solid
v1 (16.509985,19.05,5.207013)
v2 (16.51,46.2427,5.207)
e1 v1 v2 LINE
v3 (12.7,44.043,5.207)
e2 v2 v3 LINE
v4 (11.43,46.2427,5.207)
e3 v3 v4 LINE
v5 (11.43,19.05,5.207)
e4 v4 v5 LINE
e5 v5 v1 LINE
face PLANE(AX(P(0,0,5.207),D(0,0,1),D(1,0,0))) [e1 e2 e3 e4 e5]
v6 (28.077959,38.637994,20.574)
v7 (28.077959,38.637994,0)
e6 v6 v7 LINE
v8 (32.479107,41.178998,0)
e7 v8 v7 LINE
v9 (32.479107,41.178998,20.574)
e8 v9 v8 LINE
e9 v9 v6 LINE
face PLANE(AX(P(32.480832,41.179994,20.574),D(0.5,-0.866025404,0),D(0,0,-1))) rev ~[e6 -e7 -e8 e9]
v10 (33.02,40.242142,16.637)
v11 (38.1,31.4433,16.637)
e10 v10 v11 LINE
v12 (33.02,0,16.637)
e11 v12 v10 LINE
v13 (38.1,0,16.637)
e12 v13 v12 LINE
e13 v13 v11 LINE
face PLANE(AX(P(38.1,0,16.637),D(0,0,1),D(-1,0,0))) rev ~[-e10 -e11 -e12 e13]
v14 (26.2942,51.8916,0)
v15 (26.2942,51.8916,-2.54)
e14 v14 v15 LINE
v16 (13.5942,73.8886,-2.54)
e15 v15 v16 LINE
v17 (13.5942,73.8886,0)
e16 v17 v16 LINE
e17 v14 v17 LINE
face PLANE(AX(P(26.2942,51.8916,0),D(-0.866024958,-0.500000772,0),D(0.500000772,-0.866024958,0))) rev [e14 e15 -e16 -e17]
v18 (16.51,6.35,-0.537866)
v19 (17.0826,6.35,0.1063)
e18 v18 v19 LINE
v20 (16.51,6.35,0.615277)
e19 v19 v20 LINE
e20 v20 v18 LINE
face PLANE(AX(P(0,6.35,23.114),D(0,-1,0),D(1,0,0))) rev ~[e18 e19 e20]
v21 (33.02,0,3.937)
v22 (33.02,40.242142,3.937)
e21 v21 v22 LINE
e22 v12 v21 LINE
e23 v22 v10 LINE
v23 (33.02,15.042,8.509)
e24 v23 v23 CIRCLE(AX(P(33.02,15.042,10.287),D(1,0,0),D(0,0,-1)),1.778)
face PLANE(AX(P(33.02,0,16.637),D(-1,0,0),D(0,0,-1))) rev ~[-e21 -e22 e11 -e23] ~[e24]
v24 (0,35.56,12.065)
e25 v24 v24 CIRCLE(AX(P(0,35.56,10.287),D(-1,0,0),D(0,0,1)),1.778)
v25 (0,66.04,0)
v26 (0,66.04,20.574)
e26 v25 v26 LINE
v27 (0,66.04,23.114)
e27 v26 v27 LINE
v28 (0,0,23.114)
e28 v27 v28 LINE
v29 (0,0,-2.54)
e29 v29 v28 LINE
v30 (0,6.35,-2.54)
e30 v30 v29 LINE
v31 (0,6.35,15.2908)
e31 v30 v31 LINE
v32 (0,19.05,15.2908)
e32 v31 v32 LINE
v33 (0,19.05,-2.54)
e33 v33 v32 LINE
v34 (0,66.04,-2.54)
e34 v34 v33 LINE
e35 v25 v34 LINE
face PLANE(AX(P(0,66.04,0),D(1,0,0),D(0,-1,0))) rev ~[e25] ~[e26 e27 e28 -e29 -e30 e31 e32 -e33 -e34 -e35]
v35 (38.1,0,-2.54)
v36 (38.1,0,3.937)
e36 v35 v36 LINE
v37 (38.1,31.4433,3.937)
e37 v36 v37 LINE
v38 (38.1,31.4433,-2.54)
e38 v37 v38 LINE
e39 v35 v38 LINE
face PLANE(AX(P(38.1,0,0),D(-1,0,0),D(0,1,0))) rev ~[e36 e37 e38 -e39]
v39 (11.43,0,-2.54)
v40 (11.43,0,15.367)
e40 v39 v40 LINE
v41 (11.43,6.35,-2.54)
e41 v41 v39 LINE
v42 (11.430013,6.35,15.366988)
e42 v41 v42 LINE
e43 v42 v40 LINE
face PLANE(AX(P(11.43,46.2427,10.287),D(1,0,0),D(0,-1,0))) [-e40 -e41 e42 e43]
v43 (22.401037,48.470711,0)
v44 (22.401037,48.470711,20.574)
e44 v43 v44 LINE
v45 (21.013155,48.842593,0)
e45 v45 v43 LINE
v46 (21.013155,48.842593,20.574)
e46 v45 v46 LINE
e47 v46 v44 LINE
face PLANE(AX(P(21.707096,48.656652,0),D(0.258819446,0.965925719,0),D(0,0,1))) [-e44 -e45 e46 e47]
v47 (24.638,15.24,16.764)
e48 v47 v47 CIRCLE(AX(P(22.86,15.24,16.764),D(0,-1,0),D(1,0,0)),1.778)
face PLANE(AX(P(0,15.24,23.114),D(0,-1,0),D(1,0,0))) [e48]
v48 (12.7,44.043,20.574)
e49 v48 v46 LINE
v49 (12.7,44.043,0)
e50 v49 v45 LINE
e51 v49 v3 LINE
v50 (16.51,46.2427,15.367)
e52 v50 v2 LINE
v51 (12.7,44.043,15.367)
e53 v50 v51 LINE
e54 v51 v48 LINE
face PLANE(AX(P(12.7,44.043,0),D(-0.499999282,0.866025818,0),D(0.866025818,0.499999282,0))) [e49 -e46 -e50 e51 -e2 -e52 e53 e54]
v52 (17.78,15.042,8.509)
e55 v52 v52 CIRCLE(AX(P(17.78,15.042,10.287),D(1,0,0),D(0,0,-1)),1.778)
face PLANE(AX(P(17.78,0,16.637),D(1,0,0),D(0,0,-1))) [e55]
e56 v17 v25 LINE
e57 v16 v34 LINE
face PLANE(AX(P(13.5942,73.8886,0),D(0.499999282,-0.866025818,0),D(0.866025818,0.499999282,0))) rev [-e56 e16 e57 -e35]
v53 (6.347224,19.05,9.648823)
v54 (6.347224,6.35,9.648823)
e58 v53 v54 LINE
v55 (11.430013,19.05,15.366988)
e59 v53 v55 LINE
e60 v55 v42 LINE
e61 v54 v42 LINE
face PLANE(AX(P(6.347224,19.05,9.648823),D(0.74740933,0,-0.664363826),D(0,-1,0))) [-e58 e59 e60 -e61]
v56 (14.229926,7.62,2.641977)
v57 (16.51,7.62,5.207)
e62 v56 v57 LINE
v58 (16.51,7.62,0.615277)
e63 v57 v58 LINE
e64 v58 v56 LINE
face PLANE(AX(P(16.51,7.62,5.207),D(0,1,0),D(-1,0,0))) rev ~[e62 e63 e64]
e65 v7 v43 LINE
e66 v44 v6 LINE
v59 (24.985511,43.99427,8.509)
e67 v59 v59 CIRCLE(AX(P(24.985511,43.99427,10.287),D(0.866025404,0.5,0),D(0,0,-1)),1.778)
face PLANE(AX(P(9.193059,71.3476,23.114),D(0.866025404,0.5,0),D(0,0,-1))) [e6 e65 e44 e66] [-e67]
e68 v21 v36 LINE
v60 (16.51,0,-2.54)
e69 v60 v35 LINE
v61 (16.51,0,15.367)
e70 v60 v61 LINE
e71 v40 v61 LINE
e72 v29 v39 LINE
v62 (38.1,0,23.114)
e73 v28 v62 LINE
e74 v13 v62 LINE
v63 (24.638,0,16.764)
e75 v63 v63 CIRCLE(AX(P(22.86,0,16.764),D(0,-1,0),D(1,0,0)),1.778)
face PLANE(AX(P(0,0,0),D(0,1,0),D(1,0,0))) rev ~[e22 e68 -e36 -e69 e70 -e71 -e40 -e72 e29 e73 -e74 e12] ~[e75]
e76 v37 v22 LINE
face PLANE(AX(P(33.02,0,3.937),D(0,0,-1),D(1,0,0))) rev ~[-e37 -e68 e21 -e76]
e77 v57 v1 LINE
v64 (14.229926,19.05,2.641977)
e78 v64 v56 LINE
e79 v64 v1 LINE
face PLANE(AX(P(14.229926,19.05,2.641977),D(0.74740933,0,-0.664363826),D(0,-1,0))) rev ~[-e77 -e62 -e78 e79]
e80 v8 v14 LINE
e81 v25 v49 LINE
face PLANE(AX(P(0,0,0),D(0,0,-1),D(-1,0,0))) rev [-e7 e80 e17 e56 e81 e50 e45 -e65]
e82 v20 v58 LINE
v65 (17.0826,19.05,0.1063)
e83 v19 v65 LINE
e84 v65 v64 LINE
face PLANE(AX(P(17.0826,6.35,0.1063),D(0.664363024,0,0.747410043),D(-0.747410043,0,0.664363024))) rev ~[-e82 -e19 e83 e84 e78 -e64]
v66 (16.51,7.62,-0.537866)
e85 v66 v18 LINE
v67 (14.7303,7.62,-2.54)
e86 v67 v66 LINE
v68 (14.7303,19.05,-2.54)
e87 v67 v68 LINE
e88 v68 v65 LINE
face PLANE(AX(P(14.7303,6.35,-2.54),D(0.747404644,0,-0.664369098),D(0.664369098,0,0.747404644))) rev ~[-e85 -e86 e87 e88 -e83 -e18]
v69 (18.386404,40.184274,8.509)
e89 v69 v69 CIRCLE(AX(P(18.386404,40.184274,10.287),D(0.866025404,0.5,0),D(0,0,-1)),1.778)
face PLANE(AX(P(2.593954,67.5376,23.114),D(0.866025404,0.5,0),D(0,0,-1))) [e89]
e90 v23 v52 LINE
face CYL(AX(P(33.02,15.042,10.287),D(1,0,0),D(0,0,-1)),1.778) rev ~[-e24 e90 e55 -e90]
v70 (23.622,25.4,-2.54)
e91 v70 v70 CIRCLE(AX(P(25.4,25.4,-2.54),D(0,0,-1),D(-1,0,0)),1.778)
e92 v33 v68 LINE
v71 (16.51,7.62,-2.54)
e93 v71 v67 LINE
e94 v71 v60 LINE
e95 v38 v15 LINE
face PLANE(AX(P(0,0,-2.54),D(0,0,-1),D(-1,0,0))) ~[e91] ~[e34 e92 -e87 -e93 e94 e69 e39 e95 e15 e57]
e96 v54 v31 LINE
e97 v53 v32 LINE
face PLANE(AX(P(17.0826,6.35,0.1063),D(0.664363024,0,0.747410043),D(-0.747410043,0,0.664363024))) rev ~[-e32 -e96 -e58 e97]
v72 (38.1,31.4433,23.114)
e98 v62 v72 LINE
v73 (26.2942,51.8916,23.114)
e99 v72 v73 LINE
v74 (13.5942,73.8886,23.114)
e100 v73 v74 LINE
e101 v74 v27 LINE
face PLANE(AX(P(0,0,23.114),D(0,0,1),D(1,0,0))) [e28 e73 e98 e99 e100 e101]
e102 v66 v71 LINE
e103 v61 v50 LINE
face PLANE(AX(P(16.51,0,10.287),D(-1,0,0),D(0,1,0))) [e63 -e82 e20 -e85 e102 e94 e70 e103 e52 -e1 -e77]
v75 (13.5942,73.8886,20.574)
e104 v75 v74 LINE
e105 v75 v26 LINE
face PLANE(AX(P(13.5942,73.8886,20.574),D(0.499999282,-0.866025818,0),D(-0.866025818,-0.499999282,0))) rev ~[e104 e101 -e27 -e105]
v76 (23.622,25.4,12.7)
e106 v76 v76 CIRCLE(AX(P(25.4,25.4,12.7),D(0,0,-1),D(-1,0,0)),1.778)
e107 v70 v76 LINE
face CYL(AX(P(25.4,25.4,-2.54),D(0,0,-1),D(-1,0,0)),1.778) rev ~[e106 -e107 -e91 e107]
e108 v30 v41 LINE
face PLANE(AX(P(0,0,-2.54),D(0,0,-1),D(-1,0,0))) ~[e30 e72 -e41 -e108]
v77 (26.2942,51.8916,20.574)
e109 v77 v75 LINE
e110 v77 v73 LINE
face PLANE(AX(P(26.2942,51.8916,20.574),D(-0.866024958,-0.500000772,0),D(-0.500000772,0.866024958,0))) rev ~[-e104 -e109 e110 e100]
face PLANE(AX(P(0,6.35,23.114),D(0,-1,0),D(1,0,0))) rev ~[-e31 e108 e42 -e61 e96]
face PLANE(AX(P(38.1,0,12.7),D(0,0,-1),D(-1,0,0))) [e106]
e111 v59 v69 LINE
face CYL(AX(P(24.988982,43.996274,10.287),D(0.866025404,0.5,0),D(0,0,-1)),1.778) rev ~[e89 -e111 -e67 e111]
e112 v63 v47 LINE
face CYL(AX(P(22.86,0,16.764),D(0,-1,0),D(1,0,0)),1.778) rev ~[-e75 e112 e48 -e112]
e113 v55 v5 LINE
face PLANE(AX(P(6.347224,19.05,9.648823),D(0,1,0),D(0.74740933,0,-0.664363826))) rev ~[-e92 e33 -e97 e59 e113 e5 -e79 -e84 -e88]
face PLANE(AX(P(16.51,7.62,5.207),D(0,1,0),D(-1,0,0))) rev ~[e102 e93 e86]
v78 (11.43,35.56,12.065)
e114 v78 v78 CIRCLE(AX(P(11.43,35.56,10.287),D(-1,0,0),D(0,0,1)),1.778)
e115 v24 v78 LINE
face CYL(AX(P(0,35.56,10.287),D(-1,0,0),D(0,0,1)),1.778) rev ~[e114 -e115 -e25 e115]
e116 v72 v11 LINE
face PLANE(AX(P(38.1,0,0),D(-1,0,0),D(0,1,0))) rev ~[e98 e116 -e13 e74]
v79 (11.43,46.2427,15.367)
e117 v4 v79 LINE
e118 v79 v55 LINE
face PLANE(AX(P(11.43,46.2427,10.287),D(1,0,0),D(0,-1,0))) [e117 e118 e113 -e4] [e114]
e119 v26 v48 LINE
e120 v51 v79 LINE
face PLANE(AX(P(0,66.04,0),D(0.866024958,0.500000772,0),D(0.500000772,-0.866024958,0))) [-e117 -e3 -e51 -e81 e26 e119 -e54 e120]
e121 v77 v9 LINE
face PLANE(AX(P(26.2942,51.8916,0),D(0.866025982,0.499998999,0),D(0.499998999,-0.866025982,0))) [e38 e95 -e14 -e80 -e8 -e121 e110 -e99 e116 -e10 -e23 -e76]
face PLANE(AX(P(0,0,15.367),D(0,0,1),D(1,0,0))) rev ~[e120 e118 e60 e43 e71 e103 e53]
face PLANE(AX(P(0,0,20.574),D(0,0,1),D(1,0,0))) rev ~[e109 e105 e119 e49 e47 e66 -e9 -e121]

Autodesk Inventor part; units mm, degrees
ref_plane "YZ Plane" through (0, 0, 0) normal (1, 0, 0) x (0, 1, 0)
ref_plane "XZ Plane" through (0, 0, 0) normal (0, 1, 0) x (-1, 0, 0)
sketch "Sketch1" plane through (0, 0, 0) normal (0, 0, 1) x (1, 0, 0)
  line L0 (0, 0) -> (38.1, 0)
  line L1 (38.1, 0) -> (38.1, 31.4433)
  line L2 (0, 66.04) -> (0, 0)
  line L3 (0, 66.04) -> (13.5942, 73.8886)
  line L4 (0, 66.04) -> (12.7, 44.043)
  line L5 (12.7, 44.043) -> (26.2942, 51.8916)
  line L6 (26.2942, 51.8916) -> (13.5942, 73.8886)
  line L7 (26.2942, 51.8916) -> (38.1, 31.4433)
  dimension "d0" = 15.6972
  dimension "d1" = 25.4
  dimension "d2" = 38.1
  dimension "d3" = 66.04
  dimension "d4" = 120
extrude "Extrusion1" add sketch "Sketch1" along normal blind 20.574 contours L2 L4 L5 L7 L1 L0
sketch "Sketch2" plane through (0, 0, 20.574) normal (0, 0, 1) x (1, 0, 0)
  line L0 (0, 66.04) -> (0, 0) projected
  line L1 (0, 0) -> (38.1, 0) projected
  line L2 (38.1, 0) -> (38.1, 31.4433) projected
  line L3 (38.1, 31.4433) -> (26.2942, 51.8916) projected
  line L4 (26.2942, 51.8916) -> (12.7, 44.043) projected
  line L5 (12.7, 44.043) -> (0, 66.04) projected
  line L6 (26.2942, 51.8916) -> (13.5942, 73.8886)
  line L7 (13.5942, 73.8886) -> (0, 66.04)
  line L8 (38.1, 31.4433) -> (26.2942, 51.8916) projected
extrude "Extrusion2" add sketch "Sketch2" along normal blind 2.54
ref_plane "Work Plane1" through (0, 0, 10.287) normal (0, 0, -1) x (-1, 0, 0)
mirror "Mirror1" about plane through (0, 0, 10.287) normal (0, 0, -1) of "Extrusion2"
sketch "Sketch3" plane through (0, 0, 23.114) normal (0, -1, 0) x (1, 0, 0)
  line L0 (38.1, -25.654) -> (38.1, 0) projected
  line L1 (38.1, -6.477) -> (33.02, -6.477)
  line L2 (33.02, -6.477) -> (33.02, -19.177)
  line L3 (33.02, -19.177) -> (38.1, -19.177)
  line L4 (38.1, -19.177) -> (38.1, -6.477)
  point P0 (0, -23.114)
  point P1 (38.1, -12.827)
  dimension "d9" = 12.7
  dimension "d10" = 5.08
  dimension "d11" = 6.35
extrude "Extrusion3" cut sketch "Sketch3" against normal blind 111.125
sketch "Sketch4" plane through (33.02, 0, 16.637) normal (1, 0, 0) x (0, 0, -1)
  circle A0 centre (6.35, 15.042) radius 1.778 projected
  point P0 (16.637, 0)
extrude "Extrusion4" cut sketch "Sketch4" against normal blind 15.24
sketch "Sketch5" plane through (13.5942, 73.8886, 23.114) normal (0.8660254, 0.5, 0) x (0, 0, -1)
  line L0 (23.114, -25.4) -> (2.54, -25.4) projected
  line L1 (23.114, -25.4) -> (2.54, -25.4)
  line L2 (2.54, -25.4) -> (2.54, -37.7698)
  line L3 (2.54, -37.7698) -> (23.114, -37.7698)
  line L4 (23.114, -37.7698) -> (23.114, -25.4)
  point P0 (23.114, -57.1923)
  dimension "d16" = 12.3698
extrude "Extrusion5" cut sketch "Sketch5" against normal blind 5.08
chamfer "Chamfer1" distance 1.016 angle 45 1 edges at (21.893, 49.3506, 10.287)
sketch "Sketch6" plane through (9.1948, 71.3486, 23.114) normal (0.8660254, 0.5, 0) x (0, 0, -1)
  line L0 (22.86, -25.4) -> (2.54, -25.4) projected
  line L1 (23.114, -37.7698) -> (2.54, -37.7698) projected
  line L2 (2.54, -25.4) -> (2.54, 0) projected
  line L3 (2.54, -37.7698) -> (2.54, 0) projected
  line L4 (2.54, -25.4) -> (2.54, -37.7698)
  circle A0 centre (12.827, -31.5849) radius 1.778
  point P0 (23.114, -57.1923)
  point P1 (2.54, -31.5849)
  point P2 (12.827, -37.7698)
  dimension "d22" = 3.556
extrude "Extrusion6" cut sketch "Sketch6" against normal blind 7.62
ref_plane "Work Plane2" through (0, 0, 10.287) normal (0, 0, 1) x (1, 0, 0)
sketch "Sketch7" plane through (0, 0, 10.287) normal (0, 0, 1) x (1, 0, 0)
  line L0 (12.7, 44.043) -> (-2.54, 70.4394) projected
  line L1 (21.0809, 48.8817) -> (12.7, 44.043) projected
  line L2 (16.51, 46.2427) -> (11.43, 46.2427)
  line L3 (11.43, 46.2427) -> (11.43, 0)
  line L4 (11.43, 0) -> (16.51, 0)
  line L5 (16.51, 0) -> (16.51, 46.2427)
  line L6 (0, 0) -> (38.1, 0) projected
  dimension "d25" = 5.08
extrude "Extrusion7" cut sketch "Sketch7" along normal mid plane 10.16 contours L1 L5 L4 L3 L0
ref_plane "Work Plane3" through (0, 6.35, 23.114) normal (0, -1, 0) x (1, 0, 0)
sketch "Sketch8" plane through (0, 6.35, 23.114) normal (0, -1, 0) x (1, 0, 0)
  line L0 (0, -25.654) -> (38.1, -25.654) projected
  line L1 (0, -25.654) -> (0, 0) projected
  line L2 (14.7303, -25.654) -> (17.0826, -23.0077)
  line L3 (17.0826, -23.0077) -> (0, -7.8232)
  line L4 (4.8537, -36.7652) -> (14.7303, -25.654) projected
  line L5 (0, -32.4508) -> (-19.3376, -15.2619) projected
  point P0 (0, -23.114)
  dimension "d37" = 17.8308
extrude "Extrusion8" cut sketch "Sketch8" against normal blind 12.7
sketch "Sketch9" plane through (0, 6.35, 15.2908) normal (-0.6643638, 0, -0.7474093) x (-0.7474093, 0, 0.6643638)
  line L0 (-8.4923, 39.8927) -> (-8.4923, -6.35) projected
  line L1 (-19.039, 39.8927) -> (-19.039, -6.35) projected
  line L2 (-22.8557, 0) -> (0, 0) projected
  line L3 (0, 12.7) -> (-22.8557, 12.7) projected
  point P0 (-10.1587, -6.35)
  point P1 (-8.4923, 12.7)
  point P2 (-19.039, 12.7)
  point P3 (-19.039, 0)
  point P4 (-8.4923, 0)
extrude "Extrusion9" cut sketch "Sketch9" against normal up to next
sketch "Sketch11" plane through (0, 0, 23.114) normal (-1, 0, 0) x (0, 0, 1)
  circle A0 centre (-12.827, 35.56) radius 1.778 projected
  point P0 (-23.114, 0)
extrude "Extrusion11" cut sketch "Sketch11" against normal blind 15.24
sketch "Sketch13" plane through (0, 0, 23.114) normal (0, -1, 0) x (1, 0, 0)
  circle A0 centre (22.86, -6.35) radius 1.778 projected
  point P0 (0, -23.114)
extrude "Extrusion13" cut sketch "Sketch13" against normal blind 15.24
sketch "Sketch14" plane through (38.1, 0, -2.54) normal (0, 0, -1) x (-1, 0, 0)
  circle A0 centre (12.7, 25.4) radius 1.778 projected
  point P0 (38.1, 0)
extrude "Extrusion14" cut sketch "Sketch14" against normal blind 15.24
sketch "Sketch15" plane through (0, 0, 5.207) normal (0, 0, 1) x (1, 0, 0)
  line L0 (16.51, 6.35) -> (16.51, 0) projected
  line L1 (11.43, 0) -> (16.51, 0)
  line L2 (16.51, 0) -> (16.51, 7.62)
  line L3 (16.51, 7.62) -> (11.43, 7.62)
  line L4 (11.43, 7.62) -> (11.43, 0)
  point P0 (0, 0)
  dimension "d50" = 7.62
extrude "Extrusion15" cut sketch "Sketch15" against normal blind 12.7
equation "\"d11\" = 0.5 * d9"
properties part number "PALM 4"
